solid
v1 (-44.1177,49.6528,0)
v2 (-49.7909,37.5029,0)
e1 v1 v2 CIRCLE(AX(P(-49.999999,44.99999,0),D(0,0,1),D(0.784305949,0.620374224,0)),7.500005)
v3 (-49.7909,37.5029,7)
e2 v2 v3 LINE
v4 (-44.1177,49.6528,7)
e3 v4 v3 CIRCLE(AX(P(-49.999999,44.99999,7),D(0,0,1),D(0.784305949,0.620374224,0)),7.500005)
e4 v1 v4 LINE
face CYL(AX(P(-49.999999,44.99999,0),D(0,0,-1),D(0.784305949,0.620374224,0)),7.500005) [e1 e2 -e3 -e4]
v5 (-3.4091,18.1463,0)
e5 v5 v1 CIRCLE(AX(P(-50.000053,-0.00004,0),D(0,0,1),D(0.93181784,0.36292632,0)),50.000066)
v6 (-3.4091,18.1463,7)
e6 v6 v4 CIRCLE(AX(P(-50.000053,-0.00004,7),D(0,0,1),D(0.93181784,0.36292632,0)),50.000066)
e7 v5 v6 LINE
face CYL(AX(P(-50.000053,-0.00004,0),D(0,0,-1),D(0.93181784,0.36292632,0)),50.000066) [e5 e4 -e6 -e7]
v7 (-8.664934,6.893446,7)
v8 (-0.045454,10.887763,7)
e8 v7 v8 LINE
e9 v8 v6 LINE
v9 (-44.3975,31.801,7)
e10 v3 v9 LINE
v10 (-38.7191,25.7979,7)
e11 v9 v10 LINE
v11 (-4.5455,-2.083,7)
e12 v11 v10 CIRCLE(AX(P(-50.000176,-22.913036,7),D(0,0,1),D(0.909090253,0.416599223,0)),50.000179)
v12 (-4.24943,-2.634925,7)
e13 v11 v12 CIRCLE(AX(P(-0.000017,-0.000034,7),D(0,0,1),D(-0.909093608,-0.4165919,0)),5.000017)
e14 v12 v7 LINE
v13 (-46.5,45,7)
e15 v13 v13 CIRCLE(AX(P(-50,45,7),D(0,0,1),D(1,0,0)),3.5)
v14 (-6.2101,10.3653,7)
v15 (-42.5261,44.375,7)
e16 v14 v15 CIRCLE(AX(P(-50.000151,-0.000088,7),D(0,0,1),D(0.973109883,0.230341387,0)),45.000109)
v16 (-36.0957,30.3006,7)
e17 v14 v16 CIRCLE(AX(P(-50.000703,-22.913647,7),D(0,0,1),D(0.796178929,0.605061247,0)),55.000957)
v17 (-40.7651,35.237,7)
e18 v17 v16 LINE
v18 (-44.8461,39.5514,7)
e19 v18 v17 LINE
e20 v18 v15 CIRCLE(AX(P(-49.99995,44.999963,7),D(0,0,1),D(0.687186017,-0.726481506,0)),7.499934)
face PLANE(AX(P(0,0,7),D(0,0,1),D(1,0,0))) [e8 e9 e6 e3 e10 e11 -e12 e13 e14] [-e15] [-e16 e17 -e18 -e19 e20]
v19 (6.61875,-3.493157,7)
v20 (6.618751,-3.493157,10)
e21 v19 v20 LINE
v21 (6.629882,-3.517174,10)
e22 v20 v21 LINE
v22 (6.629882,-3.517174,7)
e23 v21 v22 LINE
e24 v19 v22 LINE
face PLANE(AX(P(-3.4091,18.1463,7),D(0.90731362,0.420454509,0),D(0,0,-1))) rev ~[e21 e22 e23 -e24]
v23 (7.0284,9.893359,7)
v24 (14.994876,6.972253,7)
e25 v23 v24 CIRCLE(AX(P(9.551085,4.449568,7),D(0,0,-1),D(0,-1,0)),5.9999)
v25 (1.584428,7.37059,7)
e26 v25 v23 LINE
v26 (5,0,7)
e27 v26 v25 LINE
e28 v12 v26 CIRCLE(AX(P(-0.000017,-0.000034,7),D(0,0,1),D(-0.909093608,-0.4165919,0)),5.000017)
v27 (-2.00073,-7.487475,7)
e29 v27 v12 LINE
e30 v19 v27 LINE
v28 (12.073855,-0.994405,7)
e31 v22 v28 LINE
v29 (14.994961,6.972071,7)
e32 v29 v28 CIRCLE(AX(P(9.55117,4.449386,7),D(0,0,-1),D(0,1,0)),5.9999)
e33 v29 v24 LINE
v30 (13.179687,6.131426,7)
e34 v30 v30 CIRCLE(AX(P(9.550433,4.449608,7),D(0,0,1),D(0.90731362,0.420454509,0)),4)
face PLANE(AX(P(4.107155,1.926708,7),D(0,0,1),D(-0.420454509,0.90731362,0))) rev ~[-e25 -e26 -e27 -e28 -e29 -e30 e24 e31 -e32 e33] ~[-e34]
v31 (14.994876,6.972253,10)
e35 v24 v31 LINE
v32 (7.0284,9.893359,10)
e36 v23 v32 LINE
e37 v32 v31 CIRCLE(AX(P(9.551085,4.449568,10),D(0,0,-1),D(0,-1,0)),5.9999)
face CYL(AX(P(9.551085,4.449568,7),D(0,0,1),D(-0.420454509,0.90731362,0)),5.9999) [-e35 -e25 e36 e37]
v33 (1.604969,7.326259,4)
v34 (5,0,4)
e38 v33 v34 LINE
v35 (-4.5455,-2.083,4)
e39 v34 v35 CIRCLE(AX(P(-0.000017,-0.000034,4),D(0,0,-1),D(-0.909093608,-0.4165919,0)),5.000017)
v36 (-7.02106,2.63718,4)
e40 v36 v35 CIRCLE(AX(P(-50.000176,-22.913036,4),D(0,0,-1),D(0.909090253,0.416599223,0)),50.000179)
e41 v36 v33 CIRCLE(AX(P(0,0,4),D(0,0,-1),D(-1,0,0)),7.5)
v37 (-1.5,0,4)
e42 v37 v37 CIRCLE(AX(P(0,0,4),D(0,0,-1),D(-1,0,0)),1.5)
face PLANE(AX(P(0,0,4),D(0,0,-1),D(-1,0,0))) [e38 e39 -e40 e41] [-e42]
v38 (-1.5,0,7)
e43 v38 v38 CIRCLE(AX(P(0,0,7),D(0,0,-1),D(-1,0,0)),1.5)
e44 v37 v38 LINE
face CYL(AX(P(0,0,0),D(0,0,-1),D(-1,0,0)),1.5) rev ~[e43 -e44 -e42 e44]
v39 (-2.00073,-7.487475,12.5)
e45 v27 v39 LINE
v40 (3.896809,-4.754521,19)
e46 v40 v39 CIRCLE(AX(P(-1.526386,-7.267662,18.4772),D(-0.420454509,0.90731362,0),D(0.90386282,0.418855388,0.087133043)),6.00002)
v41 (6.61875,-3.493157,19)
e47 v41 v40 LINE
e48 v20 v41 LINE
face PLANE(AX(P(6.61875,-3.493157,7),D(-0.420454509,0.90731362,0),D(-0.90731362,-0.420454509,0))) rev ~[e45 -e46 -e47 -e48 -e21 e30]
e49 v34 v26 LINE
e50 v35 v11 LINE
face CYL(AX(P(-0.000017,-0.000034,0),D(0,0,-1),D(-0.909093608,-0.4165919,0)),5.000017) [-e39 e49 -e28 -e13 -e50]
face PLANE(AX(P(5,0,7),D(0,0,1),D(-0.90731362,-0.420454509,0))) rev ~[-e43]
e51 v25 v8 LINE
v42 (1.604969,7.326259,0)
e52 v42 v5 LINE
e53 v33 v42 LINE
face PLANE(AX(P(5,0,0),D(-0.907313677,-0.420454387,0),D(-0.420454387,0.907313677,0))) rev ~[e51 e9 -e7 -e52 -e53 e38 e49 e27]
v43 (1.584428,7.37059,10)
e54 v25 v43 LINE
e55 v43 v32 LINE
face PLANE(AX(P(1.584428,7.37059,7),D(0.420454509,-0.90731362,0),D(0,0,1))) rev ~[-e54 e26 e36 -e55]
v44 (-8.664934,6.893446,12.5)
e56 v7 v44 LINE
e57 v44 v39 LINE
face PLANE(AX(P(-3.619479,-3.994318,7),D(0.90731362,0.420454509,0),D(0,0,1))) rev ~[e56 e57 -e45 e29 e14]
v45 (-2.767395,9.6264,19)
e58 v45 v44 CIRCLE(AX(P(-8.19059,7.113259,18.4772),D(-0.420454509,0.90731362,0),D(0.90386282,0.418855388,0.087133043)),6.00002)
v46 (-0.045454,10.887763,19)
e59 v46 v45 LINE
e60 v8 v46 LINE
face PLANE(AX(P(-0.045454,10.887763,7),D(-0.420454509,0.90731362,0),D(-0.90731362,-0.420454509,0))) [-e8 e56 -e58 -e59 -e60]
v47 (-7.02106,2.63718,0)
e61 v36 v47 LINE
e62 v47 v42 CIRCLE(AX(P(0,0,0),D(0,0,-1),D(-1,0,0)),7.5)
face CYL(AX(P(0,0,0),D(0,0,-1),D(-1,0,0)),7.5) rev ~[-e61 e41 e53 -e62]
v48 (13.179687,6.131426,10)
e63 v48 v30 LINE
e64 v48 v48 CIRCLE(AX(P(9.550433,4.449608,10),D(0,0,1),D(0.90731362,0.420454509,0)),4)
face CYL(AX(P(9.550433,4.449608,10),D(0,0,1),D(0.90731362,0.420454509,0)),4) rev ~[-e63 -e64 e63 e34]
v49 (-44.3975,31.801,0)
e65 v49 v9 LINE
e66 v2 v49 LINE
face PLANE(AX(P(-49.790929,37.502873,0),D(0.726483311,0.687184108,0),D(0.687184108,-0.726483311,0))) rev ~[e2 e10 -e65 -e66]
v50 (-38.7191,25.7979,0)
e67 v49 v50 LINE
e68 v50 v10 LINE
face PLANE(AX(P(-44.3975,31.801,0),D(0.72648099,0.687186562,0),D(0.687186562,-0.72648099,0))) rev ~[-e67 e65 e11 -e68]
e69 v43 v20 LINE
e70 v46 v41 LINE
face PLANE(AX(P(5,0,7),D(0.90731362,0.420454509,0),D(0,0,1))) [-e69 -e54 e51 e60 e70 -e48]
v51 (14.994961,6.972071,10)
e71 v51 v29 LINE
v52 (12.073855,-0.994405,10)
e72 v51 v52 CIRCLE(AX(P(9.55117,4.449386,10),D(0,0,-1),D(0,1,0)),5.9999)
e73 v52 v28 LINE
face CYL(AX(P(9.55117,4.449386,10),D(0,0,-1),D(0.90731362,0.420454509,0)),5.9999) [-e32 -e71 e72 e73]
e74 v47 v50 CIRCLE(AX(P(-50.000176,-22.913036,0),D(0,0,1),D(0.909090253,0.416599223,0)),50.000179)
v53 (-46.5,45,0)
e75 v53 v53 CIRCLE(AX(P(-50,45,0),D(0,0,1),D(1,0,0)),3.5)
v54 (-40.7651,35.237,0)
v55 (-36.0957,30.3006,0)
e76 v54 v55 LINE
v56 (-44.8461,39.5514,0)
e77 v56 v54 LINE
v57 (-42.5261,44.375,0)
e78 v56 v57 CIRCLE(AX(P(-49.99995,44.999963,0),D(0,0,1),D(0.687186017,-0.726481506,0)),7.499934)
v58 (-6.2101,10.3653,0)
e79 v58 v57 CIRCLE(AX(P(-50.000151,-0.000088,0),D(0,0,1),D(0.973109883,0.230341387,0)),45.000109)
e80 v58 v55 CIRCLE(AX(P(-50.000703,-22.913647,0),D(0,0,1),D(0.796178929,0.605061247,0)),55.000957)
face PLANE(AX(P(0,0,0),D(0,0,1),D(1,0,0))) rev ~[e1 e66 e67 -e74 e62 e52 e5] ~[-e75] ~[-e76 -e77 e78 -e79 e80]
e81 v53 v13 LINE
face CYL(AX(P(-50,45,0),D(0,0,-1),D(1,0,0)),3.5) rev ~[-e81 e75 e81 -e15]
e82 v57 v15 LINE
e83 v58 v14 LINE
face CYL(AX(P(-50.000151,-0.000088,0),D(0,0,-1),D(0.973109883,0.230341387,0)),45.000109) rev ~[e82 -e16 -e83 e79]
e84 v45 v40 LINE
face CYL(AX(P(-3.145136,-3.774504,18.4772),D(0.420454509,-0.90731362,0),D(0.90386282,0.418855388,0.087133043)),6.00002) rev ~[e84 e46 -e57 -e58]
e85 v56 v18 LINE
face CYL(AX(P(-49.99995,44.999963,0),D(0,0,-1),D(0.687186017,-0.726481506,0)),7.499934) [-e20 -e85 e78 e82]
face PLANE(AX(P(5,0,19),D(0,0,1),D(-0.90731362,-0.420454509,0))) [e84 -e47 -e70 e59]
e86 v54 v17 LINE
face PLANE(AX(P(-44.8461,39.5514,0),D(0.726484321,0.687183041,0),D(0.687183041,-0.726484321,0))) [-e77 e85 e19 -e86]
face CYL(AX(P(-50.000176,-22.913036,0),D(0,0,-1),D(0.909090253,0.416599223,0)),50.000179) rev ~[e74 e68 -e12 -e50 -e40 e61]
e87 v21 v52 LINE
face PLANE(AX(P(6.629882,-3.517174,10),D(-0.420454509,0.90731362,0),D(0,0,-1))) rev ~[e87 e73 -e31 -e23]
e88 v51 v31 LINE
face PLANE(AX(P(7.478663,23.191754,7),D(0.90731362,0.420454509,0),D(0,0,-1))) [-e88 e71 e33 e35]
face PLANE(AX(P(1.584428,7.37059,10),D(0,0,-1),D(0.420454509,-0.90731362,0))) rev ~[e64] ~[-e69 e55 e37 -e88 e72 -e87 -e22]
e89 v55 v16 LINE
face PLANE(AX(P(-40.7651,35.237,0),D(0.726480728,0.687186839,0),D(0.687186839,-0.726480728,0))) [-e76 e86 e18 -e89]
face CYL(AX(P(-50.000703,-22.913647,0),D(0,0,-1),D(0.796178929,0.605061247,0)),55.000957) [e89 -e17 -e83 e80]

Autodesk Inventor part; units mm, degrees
ref_plane "YZ Plane" through (0, 0, 0) normal (1, 0, 0) x (0, 1, 0)
ref_plane "XZ Plane" through (0, 0, 0) normal (0, 1, 0) x (-1, 0, 0)
sketch "Sketch1" plane through (0, 0, 0) normal (0, 0, 1) x (1, 0, 0)
  arc A0 (-3.4091, 18.1463) -> (-44.1177, 49.6528) centre (-50, 0) ccw
  arc A1 (-4.5455, -2.083) -> (-38.7191, 25.7979) centre (-50, -22.9129) ccw
  arc A2 (-6.2101, 10.3653) -> (-42.5261, 44.375) centre (-50, 0) ccw
  line L0 (5, 0) -> (-3.4091, 18.1463)
  arc A3 (-4.5455, -2.083) -> (5, 0) centre (0, 0) ccw
  line L1 (-50, 32.0871) -> (-50, 50) construction
  line L2 (-50, 37.7239) -> (-44.3975, 31.801)
  line L3 (-44.8461, 39.5514) -> (-40.7651, 35.237)
  line L4 (-44.3975, 31.801) -> (-38.7191, 25.7979)
  line L5 (-40.7651, 35.237) -> (-36.0957, 30.3006)
  arc A4 (-6.2101, 10.3653) -> (-36.0957, 30.3006) centre (-50, -22.9129) ccw
  circle A5 centre (-50, 45) radius 3.5
  arc A6 (-44.8461, 39.5514) -> (-42.5261, 44.375) centre (-50, 45) ccw
  arc A7 (-44.1177, 49.6528) -> (-49.7909, 37.5029) centre (-50, 45) ccw
  point P0 (19.05, 139.7)
  dimension "d65" = 5
  dimension "d66" = 20
  dimension "d74" = 5
  dimension "d75" = 7
extrude "Extrusion12" add sketch "Sketch1" along normal blind 7
sketch "Sketch16" plane through (0, 0, 7) normal (0, 0, 1) x (1, 0, 0)
  point P0 (0, 0)
sketch "Sketch19" plane through (0, 0, 0) normal (0, 0, -1) x (-1, 0, 0)
  circle A0 centre (0, 0) radius 1.5
  dimension "d101" = 3
extrude "Extrusion16" cut sketch "Sketch19" against normal blind 10
sketch "Sketch24" plane through (0, 0, 0) normal (0, 0, -1) x (-1, 0, 0)
  circle A0 centre (0, 0) radius 1.5 projected
  circle A1 centre (0, 0) radius 7.5
  dimension "d115" = 15
extrude "Extrusion19" cut sketch "Sketch24" against normal blind 4
ref_plane "Work Plane9" through (5, 0, 7) normal (-0.4204545, 0.9073136, 0) x (-0.9073136, -0.4204545, 0)
sketch "Sketch25" plane through (0, 0, 7) normal (0, 0, 1) x (1, 0, 0)
  point P0 (0, 0)
sketch "Sketch26" plane through (5, 0, 7) normal (-0.4204545, 0.9073136, 0) x (-0.9073136, -0.4204545, 0)
  point P0 (4.5366, -7)
sketch "Sketch27" plane through (5, 0, 7) normal (-0.4204545, 0.9073136, 0) x (-0.9073136, -0.4204545, 0)
  line L0 (0, -7) -> (0, 0) projected
  line L1 (0, 0) -> (0, 12)
  line L2 (0, 12) -> (3, 12)
  line L3 (0, 0) -> (9.5, 0)
  line L4 (24.5467, 0) -> (5.8129, 0) projected
  line L5 (9.5, 0) -> (9.5, 5.5)
  arc A0 (3, 12) -> (9.5, 5.5) centre (8.9772, 11.4772) ccw
  point P0 (4.5366, -7)
  dimension "d118" = 12
  dimension "d119" = 3
  dimension "d120" = 9.5
  dimension "d121" = 5.5
  dimension "d122" = 6
extrude "Extrusion20" add sketch "Sketch27" along normal blind 12 and the other way blind 3.85
sketch "Sketch30" plane through (0, 0, 4) normal (0, 0, -1) x (-1, 0, 0)
  line L0 (0, 0) -> (-4.9989, 2.3165)
  line L1 (-5, 0) -> (-1.605, 7.3263) projected
sketch "Sketch31" plane through (-3.4091, 18.1463, 7) normal (0.9073136, 0.4204545, 0) x (0, 0, -1)
  line L0 (-15.8, -20) -> (10.8, -20) projected
  line L1 (3, -17.8765) -> (3, -12.5529) projected
  line L2 (3, -17.8765) -> (3, -11.8765)
  line L3 (3, -11.8765) -> (0, -11.8765)
  line L4 (3, -17.8765) -> (0, -17.8765) projected
  line L5 (3, -17.8765) -> (3, -23.8765)
  line L6 (3, -17.8765) -> (3, -22.8977) projected
  line L7 (0, -11.8765) -> (-3, -11.8765)
  line L8 (-3, -11.8765) -> (-3, -23.8765)
  line L9 (-3, -23.8765) -> (0, -23.8765)
  line L10 (0, -23.8765) -> (0, -11.8765)
  point P0 (7, -17.8977)
  point P1 (3, -20)
  dimension "d129" = 6
  dimension "d130" = 3
  dimension "d131" = 6
  dimension "d132" = 3
extrude "Extrusion21" add sketch "Sketch31" along normal blind 12 contours L8 L7 L10 L0 | L0 L10 L9 L8
sketch "Sketch32" plane through (6.6188, -3.4932, 10) normal (0, 0, 1) x (0.9073136, 0.4204545, 0)
  line L0 (0, 11.9735) -> (0, 3.85) projected
  line L1 (0, 6.0521) -> (5.9995, 5.974) construction
  circle A0 centre (5.9995, 5.974) radius 4
  line L2 (6, 11.9735) -> (6, -0.0265) construction
  arc A1 (0, 6.0005) -> (0, 5.9475) centre (5.9995, 5.974) ccw
  line L3 (6, -0.0265) -> (12, -0.0265)
  point P0 (-4.5366, 5.9523)
  point P1 (12, 11.9735)
  dimension "d139" = 6
  dimension "d140" = 8
extrude "Extrusion22" cut sketch "Sketch32" against normal blind 3
fillet "Fillet5" radius 6 2 edges at (12.4722, 12.416, 8.5) (17.5177, 1.5283, 8.5)
properties part number "Beta_arm"
